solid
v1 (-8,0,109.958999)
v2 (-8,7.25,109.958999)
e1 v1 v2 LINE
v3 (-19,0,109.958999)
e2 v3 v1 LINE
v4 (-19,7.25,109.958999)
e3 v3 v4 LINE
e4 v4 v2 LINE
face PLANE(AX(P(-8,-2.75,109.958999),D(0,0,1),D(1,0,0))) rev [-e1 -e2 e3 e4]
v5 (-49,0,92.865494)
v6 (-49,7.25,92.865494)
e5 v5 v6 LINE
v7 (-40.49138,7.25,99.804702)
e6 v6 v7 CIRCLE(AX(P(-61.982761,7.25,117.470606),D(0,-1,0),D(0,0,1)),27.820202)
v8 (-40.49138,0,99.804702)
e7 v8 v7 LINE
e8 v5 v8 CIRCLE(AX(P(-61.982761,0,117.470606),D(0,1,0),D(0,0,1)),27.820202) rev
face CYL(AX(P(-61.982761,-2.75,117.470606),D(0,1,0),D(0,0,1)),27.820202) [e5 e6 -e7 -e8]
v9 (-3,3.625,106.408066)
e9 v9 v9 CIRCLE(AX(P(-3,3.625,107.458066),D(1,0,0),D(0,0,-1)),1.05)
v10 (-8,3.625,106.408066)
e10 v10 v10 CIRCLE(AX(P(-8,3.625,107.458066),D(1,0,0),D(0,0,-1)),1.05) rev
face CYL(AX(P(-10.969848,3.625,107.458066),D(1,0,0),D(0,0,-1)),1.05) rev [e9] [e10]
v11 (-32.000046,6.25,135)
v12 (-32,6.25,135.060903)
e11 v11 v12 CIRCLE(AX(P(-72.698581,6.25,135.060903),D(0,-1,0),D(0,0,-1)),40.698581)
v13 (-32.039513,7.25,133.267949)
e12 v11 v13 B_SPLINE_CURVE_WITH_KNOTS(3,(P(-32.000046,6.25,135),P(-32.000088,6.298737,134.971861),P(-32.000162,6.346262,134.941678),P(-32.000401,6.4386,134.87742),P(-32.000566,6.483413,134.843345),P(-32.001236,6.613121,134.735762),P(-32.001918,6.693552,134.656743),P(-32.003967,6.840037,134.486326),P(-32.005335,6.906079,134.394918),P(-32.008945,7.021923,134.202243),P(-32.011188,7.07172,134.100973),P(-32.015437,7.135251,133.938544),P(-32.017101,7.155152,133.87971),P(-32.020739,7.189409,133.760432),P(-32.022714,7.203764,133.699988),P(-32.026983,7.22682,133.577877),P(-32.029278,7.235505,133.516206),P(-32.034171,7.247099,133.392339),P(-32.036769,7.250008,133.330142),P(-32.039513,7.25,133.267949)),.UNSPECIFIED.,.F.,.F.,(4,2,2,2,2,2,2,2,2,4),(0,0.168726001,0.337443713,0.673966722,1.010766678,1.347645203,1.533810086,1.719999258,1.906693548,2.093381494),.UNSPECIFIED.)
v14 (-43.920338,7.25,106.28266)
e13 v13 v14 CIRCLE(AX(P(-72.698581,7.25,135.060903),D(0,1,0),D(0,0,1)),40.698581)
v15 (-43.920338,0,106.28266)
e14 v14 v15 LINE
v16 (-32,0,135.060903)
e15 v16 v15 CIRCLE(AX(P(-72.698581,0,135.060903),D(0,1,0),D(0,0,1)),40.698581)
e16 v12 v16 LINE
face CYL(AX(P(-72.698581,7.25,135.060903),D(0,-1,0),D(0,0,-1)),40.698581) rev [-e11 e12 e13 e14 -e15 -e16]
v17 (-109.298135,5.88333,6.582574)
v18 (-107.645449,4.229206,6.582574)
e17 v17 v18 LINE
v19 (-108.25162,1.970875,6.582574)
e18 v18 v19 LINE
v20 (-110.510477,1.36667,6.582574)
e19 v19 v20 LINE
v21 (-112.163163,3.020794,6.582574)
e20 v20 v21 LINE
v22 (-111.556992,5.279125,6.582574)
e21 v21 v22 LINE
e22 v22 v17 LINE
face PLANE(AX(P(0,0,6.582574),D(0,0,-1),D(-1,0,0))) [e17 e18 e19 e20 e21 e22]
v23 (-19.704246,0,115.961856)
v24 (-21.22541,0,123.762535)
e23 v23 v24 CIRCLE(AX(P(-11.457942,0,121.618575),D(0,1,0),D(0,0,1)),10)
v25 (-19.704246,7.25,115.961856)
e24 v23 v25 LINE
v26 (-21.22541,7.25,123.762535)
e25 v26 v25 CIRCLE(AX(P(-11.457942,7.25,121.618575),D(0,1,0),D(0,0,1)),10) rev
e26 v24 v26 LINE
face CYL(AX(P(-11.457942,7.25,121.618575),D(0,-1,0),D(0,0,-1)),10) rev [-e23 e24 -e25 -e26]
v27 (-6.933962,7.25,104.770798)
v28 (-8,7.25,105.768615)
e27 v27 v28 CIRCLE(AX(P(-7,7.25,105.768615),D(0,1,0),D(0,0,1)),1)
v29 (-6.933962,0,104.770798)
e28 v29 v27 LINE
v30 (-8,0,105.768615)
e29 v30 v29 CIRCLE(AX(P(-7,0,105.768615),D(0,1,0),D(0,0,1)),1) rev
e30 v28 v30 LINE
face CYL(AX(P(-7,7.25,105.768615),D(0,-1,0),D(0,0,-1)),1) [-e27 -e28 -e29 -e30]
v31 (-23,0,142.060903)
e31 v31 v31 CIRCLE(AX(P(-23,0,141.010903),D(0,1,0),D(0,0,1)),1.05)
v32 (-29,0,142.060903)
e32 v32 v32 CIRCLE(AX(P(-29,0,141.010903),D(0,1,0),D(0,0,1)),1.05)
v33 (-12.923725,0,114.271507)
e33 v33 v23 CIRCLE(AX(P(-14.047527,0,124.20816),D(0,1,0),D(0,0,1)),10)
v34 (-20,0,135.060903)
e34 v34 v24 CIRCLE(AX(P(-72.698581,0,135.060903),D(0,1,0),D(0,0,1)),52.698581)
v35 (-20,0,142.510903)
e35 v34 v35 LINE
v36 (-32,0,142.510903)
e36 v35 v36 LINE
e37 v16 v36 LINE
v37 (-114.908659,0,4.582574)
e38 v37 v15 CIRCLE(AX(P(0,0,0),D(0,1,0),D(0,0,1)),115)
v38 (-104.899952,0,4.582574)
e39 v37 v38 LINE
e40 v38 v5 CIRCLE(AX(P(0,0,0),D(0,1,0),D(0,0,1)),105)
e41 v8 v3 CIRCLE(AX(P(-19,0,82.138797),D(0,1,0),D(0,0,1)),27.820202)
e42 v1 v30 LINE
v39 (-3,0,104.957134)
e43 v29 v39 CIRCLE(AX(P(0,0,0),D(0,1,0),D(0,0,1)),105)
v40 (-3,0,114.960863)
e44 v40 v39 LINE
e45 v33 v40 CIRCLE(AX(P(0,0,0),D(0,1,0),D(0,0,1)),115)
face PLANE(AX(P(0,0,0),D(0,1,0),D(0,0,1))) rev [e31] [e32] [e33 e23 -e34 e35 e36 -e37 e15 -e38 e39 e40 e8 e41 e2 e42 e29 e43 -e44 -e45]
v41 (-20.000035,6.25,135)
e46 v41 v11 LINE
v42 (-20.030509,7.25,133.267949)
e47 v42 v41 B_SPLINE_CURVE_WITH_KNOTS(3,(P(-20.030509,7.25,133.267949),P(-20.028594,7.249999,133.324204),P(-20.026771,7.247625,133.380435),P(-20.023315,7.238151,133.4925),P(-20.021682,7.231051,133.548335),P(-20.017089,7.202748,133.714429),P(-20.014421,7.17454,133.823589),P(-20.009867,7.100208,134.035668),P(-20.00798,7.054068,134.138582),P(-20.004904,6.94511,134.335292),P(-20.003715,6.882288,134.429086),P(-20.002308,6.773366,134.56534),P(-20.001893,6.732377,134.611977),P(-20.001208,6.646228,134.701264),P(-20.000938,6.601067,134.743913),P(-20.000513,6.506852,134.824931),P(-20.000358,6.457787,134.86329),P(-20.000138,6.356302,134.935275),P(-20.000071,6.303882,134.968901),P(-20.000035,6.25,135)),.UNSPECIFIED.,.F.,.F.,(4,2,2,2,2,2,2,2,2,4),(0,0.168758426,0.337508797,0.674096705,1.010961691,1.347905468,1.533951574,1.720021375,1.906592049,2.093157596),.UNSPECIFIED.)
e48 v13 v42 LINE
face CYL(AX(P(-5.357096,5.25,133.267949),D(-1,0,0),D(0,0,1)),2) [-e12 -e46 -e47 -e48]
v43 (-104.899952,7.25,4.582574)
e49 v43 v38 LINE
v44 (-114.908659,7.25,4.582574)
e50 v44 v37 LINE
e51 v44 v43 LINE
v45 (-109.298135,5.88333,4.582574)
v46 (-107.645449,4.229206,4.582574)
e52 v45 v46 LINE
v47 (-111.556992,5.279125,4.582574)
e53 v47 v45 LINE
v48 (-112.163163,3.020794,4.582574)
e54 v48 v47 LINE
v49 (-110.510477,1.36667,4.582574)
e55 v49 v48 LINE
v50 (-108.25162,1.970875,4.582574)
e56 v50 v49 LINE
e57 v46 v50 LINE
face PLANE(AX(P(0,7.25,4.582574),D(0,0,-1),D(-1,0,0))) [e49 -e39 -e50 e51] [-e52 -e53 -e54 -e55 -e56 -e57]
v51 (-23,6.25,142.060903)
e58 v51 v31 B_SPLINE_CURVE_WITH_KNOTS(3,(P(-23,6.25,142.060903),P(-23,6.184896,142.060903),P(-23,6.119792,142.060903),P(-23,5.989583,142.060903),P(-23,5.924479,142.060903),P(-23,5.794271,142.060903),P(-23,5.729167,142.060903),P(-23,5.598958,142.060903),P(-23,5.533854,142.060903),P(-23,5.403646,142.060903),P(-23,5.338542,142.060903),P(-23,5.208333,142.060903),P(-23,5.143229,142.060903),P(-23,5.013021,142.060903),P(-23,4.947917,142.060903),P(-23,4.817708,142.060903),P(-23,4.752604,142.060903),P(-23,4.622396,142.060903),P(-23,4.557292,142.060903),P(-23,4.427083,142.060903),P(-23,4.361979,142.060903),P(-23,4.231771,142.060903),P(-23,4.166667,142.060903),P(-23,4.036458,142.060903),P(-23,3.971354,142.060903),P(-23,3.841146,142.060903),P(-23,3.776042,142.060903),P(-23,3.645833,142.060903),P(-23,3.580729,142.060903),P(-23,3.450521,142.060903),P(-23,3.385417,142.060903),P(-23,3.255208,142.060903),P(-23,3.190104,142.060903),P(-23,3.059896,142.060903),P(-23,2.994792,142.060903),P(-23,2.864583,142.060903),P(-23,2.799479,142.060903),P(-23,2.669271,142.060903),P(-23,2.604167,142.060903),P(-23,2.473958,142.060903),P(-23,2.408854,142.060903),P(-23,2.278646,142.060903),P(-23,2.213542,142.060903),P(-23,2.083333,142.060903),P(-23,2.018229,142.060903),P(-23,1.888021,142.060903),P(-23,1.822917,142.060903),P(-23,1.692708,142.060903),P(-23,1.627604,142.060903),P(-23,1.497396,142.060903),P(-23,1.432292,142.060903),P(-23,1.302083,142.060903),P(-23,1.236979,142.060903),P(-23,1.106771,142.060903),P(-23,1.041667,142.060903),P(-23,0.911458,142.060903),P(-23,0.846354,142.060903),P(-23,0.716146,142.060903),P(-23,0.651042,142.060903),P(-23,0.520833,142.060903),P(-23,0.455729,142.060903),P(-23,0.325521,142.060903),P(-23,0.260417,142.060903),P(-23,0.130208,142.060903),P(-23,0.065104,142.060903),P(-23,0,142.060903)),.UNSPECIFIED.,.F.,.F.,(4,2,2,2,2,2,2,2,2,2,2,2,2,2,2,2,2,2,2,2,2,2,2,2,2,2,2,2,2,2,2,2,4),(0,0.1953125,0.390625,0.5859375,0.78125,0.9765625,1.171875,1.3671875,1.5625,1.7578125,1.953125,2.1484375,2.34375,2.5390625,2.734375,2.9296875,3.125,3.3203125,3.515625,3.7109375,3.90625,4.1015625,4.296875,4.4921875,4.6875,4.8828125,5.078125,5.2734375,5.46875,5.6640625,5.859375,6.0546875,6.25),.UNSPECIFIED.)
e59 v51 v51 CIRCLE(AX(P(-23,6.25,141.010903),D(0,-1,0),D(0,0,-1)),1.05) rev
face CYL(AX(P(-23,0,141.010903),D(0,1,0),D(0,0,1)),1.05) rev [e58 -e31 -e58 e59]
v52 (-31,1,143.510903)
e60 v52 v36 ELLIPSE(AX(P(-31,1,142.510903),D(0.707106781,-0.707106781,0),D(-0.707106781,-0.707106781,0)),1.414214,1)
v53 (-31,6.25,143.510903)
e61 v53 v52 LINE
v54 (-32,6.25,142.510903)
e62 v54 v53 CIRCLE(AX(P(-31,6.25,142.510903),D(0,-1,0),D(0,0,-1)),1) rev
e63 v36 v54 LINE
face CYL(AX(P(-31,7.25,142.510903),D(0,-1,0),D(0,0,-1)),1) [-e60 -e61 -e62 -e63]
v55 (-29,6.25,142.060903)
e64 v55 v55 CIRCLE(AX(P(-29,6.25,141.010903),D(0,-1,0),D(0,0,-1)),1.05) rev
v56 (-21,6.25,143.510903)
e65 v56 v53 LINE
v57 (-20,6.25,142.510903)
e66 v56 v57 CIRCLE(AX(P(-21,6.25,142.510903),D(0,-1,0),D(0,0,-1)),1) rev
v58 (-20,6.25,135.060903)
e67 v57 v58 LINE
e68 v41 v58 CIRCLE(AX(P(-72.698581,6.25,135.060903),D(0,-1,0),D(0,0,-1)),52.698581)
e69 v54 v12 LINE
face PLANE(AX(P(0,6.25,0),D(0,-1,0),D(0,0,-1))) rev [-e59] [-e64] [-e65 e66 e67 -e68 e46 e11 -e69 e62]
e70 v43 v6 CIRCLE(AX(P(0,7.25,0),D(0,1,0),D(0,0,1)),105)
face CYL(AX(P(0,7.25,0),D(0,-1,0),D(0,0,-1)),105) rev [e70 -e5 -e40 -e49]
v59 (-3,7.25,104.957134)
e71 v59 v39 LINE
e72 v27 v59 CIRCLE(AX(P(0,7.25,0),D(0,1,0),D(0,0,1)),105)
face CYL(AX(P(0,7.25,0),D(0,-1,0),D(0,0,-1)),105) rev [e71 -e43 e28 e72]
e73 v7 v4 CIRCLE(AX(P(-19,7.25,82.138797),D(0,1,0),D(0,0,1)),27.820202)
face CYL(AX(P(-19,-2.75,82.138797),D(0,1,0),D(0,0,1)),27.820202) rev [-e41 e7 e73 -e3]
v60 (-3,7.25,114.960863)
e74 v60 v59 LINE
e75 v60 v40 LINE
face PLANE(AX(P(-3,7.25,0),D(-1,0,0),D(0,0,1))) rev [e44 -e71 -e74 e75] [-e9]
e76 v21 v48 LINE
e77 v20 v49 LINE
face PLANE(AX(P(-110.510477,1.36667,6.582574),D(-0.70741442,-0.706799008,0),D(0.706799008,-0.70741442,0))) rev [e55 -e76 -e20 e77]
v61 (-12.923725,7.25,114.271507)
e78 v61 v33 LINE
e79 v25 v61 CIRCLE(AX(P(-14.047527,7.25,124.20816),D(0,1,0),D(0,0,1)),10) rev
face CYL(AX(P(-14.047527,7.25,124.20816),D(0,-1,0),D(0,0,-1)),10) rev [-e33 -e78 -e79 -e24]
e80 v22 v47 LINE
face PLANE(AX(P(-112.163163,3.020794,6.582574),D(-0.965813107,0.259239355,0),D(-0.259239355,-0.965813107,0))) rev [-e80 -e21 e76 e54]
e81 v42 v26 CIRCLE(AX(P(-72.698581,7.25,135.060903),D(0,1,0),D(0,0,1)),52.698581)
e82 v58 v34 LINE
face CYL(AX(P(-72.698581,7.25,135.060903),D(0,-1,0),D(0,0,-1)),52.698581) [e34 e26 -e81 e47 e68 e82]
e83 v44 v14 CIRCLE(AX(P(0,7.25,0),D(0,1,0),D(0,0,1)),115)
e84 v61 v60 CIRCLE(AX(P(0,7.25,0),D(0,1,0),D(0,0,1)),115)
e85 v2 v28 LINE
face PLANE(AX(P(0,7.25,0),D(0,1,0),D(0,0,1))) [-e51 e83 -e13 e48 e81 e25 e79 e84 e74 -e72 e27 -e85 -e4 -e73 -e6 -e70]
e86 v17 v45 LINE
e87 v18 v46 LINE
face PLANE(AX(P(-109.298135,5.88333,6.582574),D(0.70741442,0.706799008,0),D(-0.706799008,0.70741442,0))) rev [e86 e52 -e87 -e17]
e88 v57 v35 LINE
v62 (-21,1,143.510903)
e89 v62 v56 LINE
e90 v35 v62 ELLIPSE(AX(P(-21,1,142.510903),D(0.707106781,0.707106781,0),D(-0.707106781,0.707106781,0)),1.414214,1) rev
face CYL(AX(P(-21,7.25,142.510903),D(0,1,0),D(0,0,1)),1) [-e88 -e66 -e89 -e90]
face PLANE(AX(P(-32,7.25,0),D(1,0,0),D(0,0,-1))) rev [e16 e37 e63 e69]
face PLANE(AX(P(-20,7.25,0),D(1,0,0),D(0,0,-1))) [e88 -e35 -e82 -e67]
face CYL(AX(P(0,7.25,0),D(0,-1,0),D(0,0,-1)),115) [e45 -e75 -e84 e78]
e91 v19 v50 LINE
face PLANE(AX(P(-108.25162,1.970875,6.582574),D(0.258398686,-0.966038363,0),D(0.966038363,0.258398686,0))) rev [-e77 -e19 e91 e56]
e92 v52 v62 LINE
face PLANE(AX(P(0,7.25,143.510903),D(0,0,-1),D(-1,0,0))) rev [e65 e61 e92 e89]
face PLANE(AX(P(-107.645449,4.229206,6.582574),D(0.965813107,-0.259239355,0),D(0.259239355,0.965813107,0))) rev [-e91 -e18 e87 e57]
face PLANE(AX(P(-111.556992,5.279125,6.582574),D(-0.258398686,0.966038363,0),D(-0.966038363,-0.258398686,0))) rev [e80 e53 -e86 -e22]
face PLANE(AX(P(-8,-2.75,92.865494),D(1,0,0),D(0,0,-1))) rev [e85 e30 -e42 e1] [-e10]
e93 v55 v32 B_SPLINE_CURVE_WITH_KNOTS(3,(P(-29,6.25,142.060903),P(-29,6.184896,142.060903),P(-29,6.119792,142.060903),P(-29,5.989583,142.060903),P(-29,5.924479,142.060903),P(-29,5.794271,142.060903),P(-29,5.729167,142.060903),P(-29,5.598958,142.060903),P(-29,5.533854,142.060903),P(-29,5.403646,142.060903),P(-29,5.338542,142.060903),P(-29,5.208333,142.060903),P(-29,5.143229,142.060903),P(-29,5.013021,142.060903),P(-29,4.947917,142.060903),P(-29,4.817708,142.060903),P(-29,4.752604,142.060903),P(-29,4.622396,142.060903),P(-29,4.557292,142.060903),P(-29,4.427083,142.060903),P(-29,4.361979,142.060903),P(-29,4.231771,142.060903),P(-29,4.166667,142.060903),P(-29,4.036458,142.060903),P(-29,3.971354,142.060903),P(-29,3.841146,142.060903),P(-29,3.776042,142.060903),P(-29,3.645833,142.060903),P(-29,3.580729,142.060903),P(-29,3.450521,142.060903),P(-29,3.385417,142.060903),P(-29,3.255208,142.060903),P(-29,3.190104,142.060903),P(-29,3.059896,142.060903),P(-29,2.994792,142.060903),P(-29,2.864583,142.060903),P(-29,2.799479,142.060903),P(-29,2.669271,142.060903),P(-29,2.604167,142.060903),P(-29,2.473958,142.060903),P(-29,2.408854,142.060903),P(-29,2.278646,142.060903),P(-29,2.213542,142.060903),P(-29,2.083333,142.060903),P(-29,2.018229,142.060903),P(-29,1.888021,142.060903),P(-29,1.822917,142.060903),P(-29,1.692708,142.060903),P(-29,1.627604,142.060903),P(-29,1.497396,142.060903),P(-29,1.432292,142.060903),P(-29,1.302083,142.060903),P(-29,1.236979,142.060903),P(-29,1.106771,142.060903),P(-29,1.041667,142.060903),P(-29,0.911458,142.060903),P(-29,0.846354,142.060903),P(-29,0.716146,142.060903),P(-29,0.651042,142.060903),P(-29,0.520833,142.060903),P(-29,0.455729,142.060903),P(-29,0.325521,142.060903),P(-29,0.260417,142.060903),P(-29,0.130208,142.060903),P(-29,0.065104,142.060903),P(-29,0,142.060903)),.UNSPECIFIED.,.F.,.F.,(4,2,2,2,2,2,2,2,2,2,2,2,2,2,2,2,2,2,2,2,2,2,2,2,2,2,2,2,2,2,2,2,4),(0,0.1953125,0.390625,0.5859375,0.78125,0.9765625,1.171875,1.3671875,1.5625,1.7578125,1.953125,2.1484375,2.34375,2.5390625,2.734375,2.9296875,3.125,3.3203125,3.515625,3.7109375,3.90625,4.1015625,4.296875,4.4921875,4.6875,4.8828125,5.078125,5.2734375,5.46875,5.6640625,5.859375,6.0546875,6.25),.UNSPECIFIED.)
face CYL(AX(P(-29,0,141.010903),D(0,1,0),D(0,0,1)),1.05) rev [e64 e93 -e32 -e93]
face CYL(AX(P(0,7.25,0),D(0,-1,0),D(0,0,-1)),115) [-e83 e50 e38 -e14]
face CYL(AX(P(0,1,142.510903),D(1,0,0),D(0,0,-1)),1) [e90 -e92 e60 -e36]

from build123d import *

# Parameters (mm, degrees)
BOSS_EXTRUDE1_DEPTH = 7.25
CUT_EXTRUDE2_DEPTH  = 2
SKETCH6_R           = 1.05
CUT_EXTRUDE3_DEPTH  = 184.988971882
FILLET1_R           = 1
CUT_EXTRUDE6_DEPTH  = 10
SKETCH14_R          = 1.05
CUT_EXTRUDE7_DEPTH  = 5
FILLET3_R           = 1
FILLET4_R           = 10
SKETCH16_W          = 40
SKETCH16_H          = 15
CUT_EXTRUDE8_DEPTH  = 1
FILLET5_R           = 2


with BuildPart() as part:
    # Sketch2 → Boss-Extrude1 (new body)
    with BuildSketch(Plane(origin=(0, 0, 0), x_dir=(1, 0, 0), z_dir=(0, 1, 0))):
        with BuildLine():
            Line((-17.623152329, -113.641649504), (-22.623152329, -118.641649504))
            ThreePointArc((-22.623152329, -118.641649504), (-20.659920019, -126.747167143), (-20, -135.060902938))
            Line((-20, -135.060902938), (-20, -143.510902938))
            Line((-20, -143.510902938), (-32, -143.510902938))
            Line((-32, -143.510902938), (-32, -135.060902938))
            ThreePointArc((-32, -135.060902938), (-35.097995018, -119.486230235), (-43.920338415, -106.282660267))
            ThreePointArc((-43.920338415, -106.282660267), (-94.299467161, -65.822568266), (-114.908659431, -4.582574373))
            Line((-114.908659431, -4.582574373), (-104.899952393, -4.582574373))
            ThreePointArc((-104.899952393, -4.582574373), (-73.684211281, -74.803990588), (-3, -104.957134107))
            Line((-3, -104.957134107), (-3, -114.960862906))
            ThreePointArc((-3, -114.960862906), (-10.332651354, -114.534869433), (-17.623152329, -113.641649504))
        make_face()
    extrude(amount=BOSS_EXTRUDE1_DEPTH)

    # Sketch4 → Cut-Extrude2 (cut)
    with BuildSketch(Plane(origin=(0, 0, 4.582574373), x_dir=(-1, 0, 0), z_dir=(0, 0, -1))):
        Polygon((111.556991832, 5.27912492), (109.29813467, 5.883330451), (107.64544875, 4.229205531), (108.251619992, 1.97087508), (110.510477153, 1.366669549), (112.163163073, 3.020794469), align=None)
    extrude(amount=-CUT_EXTRUDE2_DEPTH, mode=Mode.SUBTRACT)

    # Sketch6 → Cut-Extrude3 (cut, through all)
    with BuildSketch(Plane(origin=(0, 7.25, 0), x_dir=(1, 0, 0), z_dir=(0, 1, 0))):
        with Locations(Location((-29, -141.010902938, 0), (0, 0, 270))):
            Circle(SKETCH6_R)
        with Locations(Location((-23, -141.010902938, 0), (0, 0, 270))):
            Circle(SKETCH6_R)
    extrude(amount=-CUT_EXTRUDE3_DEPTH, mode=Mode.SUBTRACT)

    # Fillet1
    fillet1_edges = [part.edges().sort_by_distance(p)[0] for p in [
        (-26, 0, 143.510902938),
        (-20, 3.625, 143.510902938),
        (-32, 3.625, 143.510902938),
        (-26, 7.25, 143.510902938),
    ]]
    fillet(fillet1_edges, radius=FILLET1_R)

    # Sketch13 → Cut-Extrude6 (cut)
    with BuildSketch(Plane(origin=(0, 7.25, 0), x_dir=(1, 0, 0), z_dir=(0, 1, 0))):
        with BuildLine():
            Line((-8, -109.958998506), (-19, -109.958998506))
            ThreePointArc((-19, -109.958998506), (-30.884750495, -107.29264995), (-40.491380382, -99.804701556))
            ThreePointArc((-40.491380382, -99.804701556), (-44.399963721, -95.911179829), (-49, -92.86549413))
            Line((-49, -92.86549413), (-8, -92.86549413))
            Line((-8, -92.86549413), (-8, -109.958998506))
        make_face()
    extrude(amount=-CUT_EXTRUDE6_DEPTH, mode=Mode.SUBTRACT)

    # Sketch14 → Cut-Extrude7 (cut)
    with BuildSketch(Plane(origin=(-3, 0, 0), x_dir=(0, 0, -1), z_dir=(1, 0, 0))):
        with Locations((-107.458066307, 3.625)):
            Circle(SKETCH14_R)
    extrude(amount=-CUT_EXTRUDE7_DEPTH, mode=Mode.SUBTRACT)

    # Fillet3
    fillet3_edges = [part.edges().sort_by_distance(p)[0] for p in [
        (-8, 3.625, 104.694794522),
    ]]
    fillet(fillet3_edges, radius=FILLET3_R)

    # Fillet4
    # the kernel refuses this fillet: 10 mm, written as the material it adds along each edge
    with BuildSketch(Plane(origin=(-22.623152329, 0, 118.641649504), x_dir=(0.7071067811865469, 0, -0.7071067811865481), z_dir=(0, 1, 0))) as fillet4_piece_1:
        with BuildLine():
            CenterArc((5.789991957, -10), FILLET4_R, 90, 57.380097375)
            ThreePointArc((-2.632659996, -4.609366079), (-1.258256696, -2.337851865), (0, 0))
            Line((0, 0), (5.789991957, 0))
        make_face()
    extrude(amount=7.25)
    with BuildSketch(Plane(origin=(-17.623152329, 0, 113.641649504), x_dir=(0.9911373960250678, 0, 0.13284073998833376), z_dir=(0, 1, 0))) as fillet4_piece_2:
        with BuildLine():
            CenterArc((4.947598948, -9.997874884), FILLET4_R, 91.18123592, 51.452542901)
            Line((-3.000126671, -3.928801026), (0, 0))
            ThreePointArc((0, 0), (2.370724496, -0.024438834), (4.741448992, 0))
        make_face()
    extrude(amount=7.25)

    # Sketch16 → Cut-Extrude8 (cut)
    with BuildSketch(Plane(origin=(0, 7.25, 0), x_dir=(1, 0, 0), z_dir=(0, 1, 0))):
        with Locations((-25.357096051, -142.5)):
            Rectangle(SKETCH16_W, SKETCH16_H)
    extrude(amount=-CUT_EXTRUDE8_DEPTH, mode=Mode.SUBTRACT)

    # Fillet5
    # the kernel refuses this fillet: 2 mm, written as the material it takes off along each edge
    with BuildSketch(Plane(origin=(-15.669908173, 7.25, 135), x_dir=(0, 0, -1), z_dir=(-1, 0, 0))) as fillet5_piece_1:
        with BuildLine():
            CenterArc((1.732050808, 2), FILLET5_R, 210, 60)
            Line((0, 1), (-0.034641016, 0.98))
            ThreePointArc((-0.034641016, 0.98), (-0.04, 0.5), (-0.04, 0))
            Line((-0.04, 0), (0, -0.04))
            Line((0, -0.04), (1.732050808, -0.04))
            Line((1.732050808, -0.04), (1.732050808, 0))
        make_face()
    extrude(amount=20.660264414, mode=Mode.SUBTRACT)


solid = part.part
